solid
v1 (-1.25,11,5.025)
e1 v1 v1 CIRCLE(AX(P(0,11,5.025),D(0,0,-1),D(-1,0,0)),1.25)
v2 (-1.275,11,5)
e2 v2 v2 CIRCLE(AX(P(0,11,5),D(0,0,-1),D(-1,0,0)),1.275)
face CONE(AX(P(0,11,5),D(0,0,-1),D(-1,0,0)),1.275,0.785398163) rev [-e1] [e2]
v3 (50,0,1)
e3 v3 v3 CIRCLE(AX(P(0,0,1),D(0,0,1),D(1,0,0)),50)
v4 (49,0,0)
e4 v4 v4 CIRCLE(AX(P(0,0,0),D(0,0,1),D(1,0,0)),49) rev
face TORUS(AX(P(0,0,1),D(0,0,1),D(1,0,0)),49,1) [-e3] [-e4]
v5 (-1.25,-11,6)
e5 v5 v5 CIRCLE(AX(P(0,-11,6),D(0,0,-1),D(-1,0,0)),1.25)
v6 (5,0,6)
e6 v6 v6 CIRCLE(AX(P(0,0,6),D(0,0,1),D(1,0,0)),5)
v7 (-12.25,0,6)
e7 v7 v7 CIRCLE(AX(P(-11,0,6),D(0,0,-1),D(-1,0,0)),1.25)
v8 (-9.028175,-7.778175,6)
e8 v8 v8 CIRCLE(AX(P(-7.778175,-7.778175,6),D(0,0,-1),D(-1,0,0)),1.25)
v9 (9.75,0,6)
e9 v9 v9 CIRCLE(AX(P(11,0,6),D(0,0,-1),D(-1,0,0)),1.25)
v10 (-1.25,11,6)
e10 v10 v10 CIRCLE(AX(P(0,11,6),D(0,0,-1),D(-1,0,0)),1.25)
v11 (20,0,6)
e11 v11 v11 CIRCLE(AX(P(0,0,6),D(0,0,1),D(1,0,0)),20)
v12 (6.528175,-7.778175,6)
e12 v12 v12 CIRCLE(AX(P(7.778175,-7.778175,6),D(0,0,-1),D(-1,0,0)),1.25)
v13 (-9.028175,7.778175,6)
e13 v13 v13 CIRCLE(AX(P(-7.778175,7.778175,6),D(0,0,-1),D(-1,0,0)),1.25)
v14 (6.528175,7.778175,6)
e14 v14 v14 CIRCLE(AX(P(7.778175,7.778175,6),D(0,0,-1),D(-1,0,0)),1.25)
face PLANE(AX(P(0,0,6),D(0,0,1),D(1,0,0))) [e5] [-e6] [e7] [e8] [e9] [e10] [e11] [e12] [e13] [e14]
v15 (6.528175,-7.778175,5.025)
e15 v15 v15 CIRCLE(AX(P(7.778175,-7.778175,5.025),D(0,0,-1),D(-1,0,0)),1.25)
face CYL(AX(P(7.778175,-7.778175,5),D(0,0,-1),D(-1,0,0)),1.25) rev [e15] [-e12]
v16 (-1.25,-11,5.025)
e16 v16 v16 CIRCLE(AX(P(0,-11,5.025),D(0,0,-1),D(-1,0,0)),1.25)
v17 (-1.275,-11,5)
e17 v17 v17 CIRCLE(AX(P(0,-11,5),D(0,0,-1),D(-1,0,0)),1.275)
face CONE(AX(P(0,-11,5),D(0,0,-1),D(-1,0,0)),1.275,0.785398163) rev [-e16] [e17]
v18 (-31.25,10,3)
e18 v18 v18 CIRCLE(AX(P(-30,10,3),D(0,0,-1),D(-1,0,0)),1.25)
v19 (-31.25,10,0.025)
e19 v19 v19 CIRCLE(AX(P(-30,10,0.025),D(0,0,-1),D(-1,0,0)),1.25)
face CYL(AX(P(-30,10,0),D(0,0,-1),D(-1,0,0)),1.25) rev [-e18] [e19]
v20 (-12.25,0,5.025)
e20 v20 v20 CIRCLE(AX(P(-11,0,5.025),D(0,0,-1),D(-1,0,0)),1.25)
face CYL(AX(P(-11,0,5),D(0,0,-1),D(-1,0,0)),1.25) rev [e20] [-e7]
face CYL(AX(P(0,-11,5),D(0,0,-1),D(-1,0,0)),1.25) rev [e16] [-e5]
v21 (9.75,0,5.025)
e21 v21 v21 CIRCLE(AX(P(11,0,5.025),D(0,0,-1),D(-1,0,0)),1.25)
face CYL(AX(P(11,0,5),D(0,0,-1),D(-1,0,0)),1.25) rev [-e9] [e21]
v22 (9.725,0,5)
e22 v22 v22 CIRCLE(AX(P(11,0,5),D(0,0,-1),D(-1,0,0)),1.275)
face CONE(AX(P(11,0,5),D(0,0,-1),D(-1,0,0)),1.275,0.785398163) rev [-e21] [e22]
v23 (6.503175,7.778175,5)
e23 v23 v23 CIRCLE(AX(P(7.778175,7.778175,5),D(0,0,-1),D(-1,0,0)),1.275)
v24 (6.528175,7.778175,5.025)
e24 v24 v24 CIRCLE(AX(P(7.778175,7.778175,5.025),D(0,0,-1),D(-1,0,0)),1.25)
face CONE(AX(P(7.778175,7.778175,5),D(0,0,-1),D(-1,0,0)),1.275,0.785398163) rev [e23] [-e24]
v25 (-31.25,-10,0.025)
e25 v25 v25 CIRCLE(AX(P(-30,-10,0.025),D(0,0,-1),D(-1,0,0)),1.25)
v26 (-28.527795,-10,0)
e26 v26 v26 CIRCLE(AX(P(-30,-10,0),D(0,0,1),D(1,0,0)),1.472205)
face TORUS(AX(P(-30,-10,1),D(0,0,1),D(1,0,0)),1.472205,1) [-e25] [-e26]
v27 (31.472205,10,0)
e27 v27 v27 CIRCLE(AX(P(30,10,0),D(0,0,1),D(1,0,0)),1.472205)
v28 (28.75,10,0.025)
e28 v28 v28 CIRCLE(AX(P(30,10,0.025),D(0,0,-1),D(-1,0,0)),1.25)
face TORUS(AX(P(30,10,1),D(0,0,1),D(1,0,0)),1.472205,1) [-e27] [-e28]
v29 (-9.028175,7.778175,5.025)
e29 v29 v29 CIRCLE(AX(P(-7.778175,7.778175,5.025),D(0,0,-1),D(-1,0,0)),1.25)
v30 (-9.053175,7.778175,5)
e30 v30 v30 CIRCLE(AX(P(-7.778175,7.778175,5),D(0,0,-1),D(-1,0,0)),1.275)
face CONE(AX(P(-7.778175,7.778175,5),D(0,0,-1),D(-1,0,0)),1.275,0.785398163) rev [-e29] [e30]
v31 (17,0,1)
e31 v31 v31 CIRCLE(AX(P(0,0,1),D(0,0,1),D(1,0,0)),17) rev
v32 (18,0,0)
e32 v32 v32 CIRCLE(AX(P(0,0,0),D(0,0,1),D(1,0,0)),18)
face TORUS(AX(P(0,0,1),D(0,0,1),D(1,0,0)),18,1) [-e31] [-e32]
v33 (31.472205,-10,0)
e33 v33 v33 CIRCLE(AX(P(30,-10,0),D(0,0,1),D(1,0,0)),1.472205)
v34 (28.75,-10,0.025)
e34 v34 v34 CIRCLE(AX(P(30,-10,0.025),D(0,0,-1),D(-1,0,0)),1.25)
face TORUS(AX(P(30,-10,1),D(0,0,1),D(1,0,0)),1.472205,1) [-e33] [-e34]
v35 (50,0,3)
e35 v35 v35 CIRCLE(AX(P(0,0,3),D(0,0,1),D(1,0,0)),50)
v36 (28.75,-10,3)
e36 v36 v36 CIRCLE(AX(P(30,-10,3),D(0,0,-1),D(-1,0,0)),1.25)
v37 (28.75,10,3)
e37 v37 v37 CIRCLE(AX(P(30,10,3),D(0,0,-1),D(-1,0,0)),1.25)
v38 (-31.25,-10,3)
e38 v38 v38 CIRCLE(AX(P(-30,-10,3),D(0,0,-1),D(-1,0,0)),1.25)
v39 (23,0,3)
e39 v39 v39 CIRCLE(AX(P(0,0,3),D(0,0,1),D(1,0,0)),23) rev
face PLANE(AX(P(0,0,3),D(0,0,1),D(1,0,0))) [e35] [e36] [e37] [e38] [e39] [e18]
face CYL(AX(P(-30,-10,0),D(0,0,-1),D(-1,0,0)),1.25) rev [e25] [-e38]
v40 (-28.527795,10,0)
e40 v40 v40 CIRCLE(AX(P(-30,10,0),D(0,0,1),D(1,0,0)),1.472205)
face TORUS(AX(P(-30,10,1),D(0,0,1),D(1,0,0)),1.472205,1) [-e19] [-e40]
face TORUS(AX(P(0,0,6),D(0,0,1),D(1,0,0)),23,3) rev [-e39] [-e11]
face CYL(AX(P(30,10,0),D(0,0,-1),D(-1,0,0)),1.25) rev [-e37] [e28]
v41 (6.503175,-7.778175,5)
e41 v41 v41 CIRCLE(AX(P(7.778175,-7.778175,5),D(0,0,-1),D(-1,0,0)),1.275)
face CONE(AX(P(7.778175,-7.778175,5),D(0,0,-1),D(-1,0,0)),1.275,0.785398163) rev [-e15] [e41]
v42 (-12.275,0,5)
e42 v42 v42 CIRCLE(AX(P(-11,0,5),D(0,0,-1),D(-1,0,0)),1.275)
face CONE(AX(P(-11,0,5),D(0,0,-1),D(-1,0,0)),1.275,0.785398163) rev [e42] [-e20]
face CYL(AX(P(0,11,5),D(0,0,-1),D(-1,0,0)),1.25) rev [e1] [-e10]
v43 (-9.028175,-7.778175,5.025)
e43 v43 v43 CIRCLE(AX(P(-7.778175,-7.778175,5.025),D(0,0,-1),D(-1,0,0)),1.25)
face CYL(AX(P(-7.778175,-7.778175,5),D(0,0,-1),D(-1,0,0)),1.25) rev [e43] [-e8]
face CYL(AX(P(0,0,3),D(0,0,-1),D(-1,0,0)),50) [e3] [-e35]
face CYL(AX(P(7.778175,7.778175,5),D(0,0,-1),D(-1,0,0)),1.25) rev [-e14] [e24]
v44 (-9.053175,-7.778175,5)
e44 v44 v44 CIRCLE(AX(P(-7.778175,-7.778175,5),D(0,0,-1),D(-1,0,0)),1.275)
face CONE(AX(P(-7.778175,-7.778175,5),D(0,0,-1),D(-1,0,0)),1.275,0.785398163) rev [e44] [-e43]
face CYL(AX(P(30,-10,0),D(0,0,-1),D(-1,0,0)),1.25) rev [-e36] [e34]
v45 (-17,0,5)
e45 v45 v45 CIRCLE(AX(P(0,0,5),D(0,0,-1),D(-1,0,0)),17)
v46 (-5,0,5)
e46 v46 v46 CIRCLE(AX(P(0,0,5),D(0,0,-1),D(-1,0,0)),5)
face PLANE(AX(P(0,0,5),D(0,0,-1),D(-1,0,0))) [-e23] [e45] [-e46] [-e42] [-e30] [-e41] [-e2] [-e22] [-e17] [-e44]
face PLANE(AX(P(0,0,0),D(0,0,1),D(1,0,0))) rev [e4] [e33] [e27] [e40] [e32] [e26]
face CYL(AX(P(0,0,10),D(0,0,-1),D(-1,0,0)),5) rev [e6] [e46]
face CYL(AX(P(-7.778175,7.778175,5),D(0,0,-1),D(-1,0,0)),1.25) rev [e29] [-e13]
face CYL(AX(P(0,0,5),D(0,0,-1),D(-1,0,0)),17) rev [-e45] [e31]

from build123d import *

# Parameters (mm, degrees)
SKETCH_1_R            = 50
EXTRUDE_1_DEPTH       = 3
F_2_5MM_1_D           = 2.5
F_2_5MM_1_CSINK_D     = 2.55
F_2_5MM_1_CSINK_ANGLE = 90
SKETCH_5_R            = 20
EXTRUDE_2_DEPTH       = 3
SKETCH_6_R            = 17
CUT_EXTRUDE_1_DEPTH   = 5
F_2_5MM_2_AT_2_COUNT  = 2
F_2_5MM_2_AT_2_PITCH  = 8.419035512
F_2_5MM_2_AT_3_COUNT  = 2
F_2_5MM_2_AT_3_PITCH  = 15.556349186
F_2_5MM_2_AT_4_COUNT  = 2
F_2_5MM_2_AT_4_PITCH  = 20.325349715
F_2_5MM_2_AT_5_COUNT  = 2
F_2_5MM_2_AT_5_PITCH  = 22
F_2_5MM_2_AT_6_COUNT  = 2
F_2_5MM_2_AT_6_PITCH  = 20.325349715
F_2_5MM_2_AT_7_COUNT  = 2
F_2_5MM_2_AT_7_PITCH  = 15.556349186
F_2_5MM_2_AT_8_COUNT  = 2
F_2_5MM_2_AT_8_PITCH  = 8.419035512
SKETCH_10_R           = 5
CUT_EXTRUDE_2_DEPTH   = 5
FILLET_1_R            = 1
FILLET_3_R            = 3


# Some blends are built 0.0001 mm under size
with BuildPart() as part:
    # 草图1 → 凸台-拉伸1 (new body)
    with BuildSketch(Plane.XY):
        Circle(SKETCH_1_R)
    extrude(amount=EXTRUDE_1_DEPTH)

    # Ø2.5mm 暗销孔1 (through all)
    with Locations(Plane(origin=(0, 0, 0), x_dir=(-1, 0, 0), z_dir=(0, 0, -1))):
        with Locations((-30, 10), (-30, -10), (30, -10), (30, 10)):
            CounterSinkHole(F_2_5MM_1_D / 2, F_2_5MM_1_CSINK_D / 2, counter_sink_angle=F_2_5MM_1_CSINK_ANGLE)

    # 草图5 → 凸台-拉伸2 (add)
    with BuildSketch(Plane.XY.offset(3)):
        Circle(SKETCH_5_R)
    extrude(amount=EXTRUDE_2_DEPTH)

    # 草图6 → 切除-拉伸1 (cut)
    with BuildSketch(Plane(origin=(0, 0, 0), x_dir=(-1, 0, 0), z_dir=(0, 0, -1))):
        Circle(SKETCH_6_R)
    extrude(amount=-CUT_EXTRUDE_1_DEPTH, mode=Mode.SUBTRACT)

    # 草图9 → Ø2.5mm 暗销孔2 (revolve, cut)
    with BuildSketch(Plane(origin=(11, 0, 5), x_dir=(0, 1, 0), z_dir=(1, 0, 0))):
        Polygon((0, 0), (0, 1), (1.25, 1), (1.25, 0.025), (1.275, 0), align=None)
    f_2_5mm_2 = revolve(axis=Axis((11, 0, -1.35), (0, 0, 1)), mode=Mode.SUBTRACT)

    # Ø2.5mm 暗销孔2 at 2: Ø2.5mm 暗销孔2 ×2
    with Locations(*[Vector(-0.38268343236200486, 0.9238795325125646, 0) * (i * F_2_5MM_2_AT_2_PITCH) for i in range(1, F_2_5MM_2_AT_2_COUNT)]):
        add(f_2_5mm_2, mode=Mode.SUBTRACT)

    # Ø2.5mm 暗销孔2 at 3: Ø2.5mm 暗销孔2 ×2
    with Locations(*[Vector(-0.7071067811841869, 0.7071067811889081, 0) * (i * F_2_5MM_2_AT_3_PITCH) for i in range(1, F_2_5MM_2_AT_3_COUNT)]):
        add(f_2_5mm_2, mode=Mode.SUBTRACT)

    # Ø2.5mm 暗销孔2 at 4: Ø2.5mm 暗销孔2 ×2
    with Locations(*[Vector(-0.9238795325100095, 0.3826834323681732, 0) * (i * F_2_5MM_2_AT_4_PITCH) for i in range(1, F_2_5MM_2_AT_4_COUNT)]):
        add(f_2_5mm_2, mode=Mode.SUBTRACT)

    # Ø2.5mm 暗销孔2 at 5: Ø2.5mm 暗销孔2 ×2
    with Locations(*[(-i * F_2_5MM_2_AT_5_PITCH, 0, 0) for i in range(1, F_2_5MM_2_AT_5_COUNT)]):
        add(f_2_5mm_2, mode=Mode.SUBTRACT)

    # Ø2.5mm 暗销孔2 at 6: Ø2.5mm 暗销孔2 ×2
    with Locations(*[Vector(-0.9238795325125633, -0.38268343236200797, 0) * (i * F_2_5MM_2_AT_6_PITCH) for i in range(1, F_2_5MM_2_AT_6_COUNT)]):
        add(f_2_5mm_2, mode=Mode.SUBTRACT)

    # Ø2.5mm 暗销孔2 at 7: Ø2.5mm 暗销孔2 ×2
    with Locations(*[Vector(-0.7071067811889058, -0.7071067811841893, 0) * (i * F_2_5MM_2_AT_7_PITCH) for i in range(1, F_2_5MM_2_AT_7_COUNT)]):
        add(f_2_5mm_2, mode=Mode.SUBTRACT)

    # Ø2.5mm 暗销孔2 at 8: Ø2.5mm 暗销孔2 ×2
    with Locations(*[Vector(-0.3826834323681702, -0.9238795325100109, 0) * (i * F_2_5MM_2_AT_8_PITCH) for i in range(1, F_2_5MM_2_AT_8_COUNT)]):
        add(f_2_5mm_2, mode=Mode.SUBTRACT)

    # 草图10 → 切除-拉伸2 (cut)
    with BuildSketch(Plane(origin=(0, 0, 5), x_dir=(-1, 0, 0), z_dir=(0, 0, -1))):
        Circle(SKETCH_10_R)
    extrude(amount=-CUT_EXTRUDE_2_DEPTH, mode=Mode.SUBTRACT)

    # 圆角1
    # the kernel refuses this fillet: 1 mm, written as the material it takes off along each edge
    with BuildSketch(Plane(origin=(-30, -10, 0), x_dir=(1, 0, 0), z_dir=(0, -1, 0))) as fillet_1_piece_1:
        with BuildLine():
            CenterArc((1.47220486, 1), FILLET_1_R, 257.161431859, 12.838568141)
            Line((1.25, 0.025), (1.245555903, 0.0055))
            ThreePointArc((1.245555903, 0.0055), (1.248357864, -0.001642136), (1.260857864, -0.014142136))
            Line((1.260857864, -0.014142136), (1.275, -0.02))
            Line((1.275, -0.02), (1.47220486, -0.02))
            Line((1.47220486, -0.02), (1.47220486, 0))
        make_face()
    revolve(axis=Axis((-30, -10, 0), (0, 0, 1)), mode=Mode.SUBTRACT)
    with BuildSketch(Plane(origin=(0, 0, 0), x_dir=(1, 0, 0), z_dir=(0, -1, 0))) as fillet_1_piece_2:
        with BuildLine():
            CenterArc((50 - FILLET_1_R, FILLET_1_R), FILLET_1_R, 270, 90)
            Line((50 - FILLET_1_R, 0), (50 - FILLET_1_R, -FILLET_1_R * 0.02))
            Line((50 - FILLET_1_R, -FILLET_1_R * 0.02), (50 + FILLET_1_R * 0.02, -FILLET_1_R * 0.02))
            Line((50 + FILLET_1_R * 0.02, -FILLET_1_R * 0.02), (50 + FILLET_1_R * 0.02, FILLET_1_R))
            Line((50 + FILLET_1_R * 0.02, FILLET_1_R), (50, FILLET_1_R))
        make_face()
    revolve(axis=Axis((0, 0, 0), (0, 0, 1)), mode=Mode.SUBTRACT)
    with BuildSketch(Plane(origin=(30, -10, 0), x_dir=(1, 0, 0), z_dir=(0, -1, 0))) as fillet_1_piece_3:
        with BuildLine():
            CenterArc((1.47220486, 1), FILLET_1_R, 257.161431859, 12.838568141)
            Line((1.25, 0.025), (1.245555903, 0.0055))
            ThreePointArc((1.245555903, 0.0055), (1.248357864, -0.001642136), (1.260857864, -0.014142136))
            Line((1.260857864, -0.014142136), (1.275, -0.02))
            Line((1.275, -0.02), (1.47220486, -0.02))
            Line((1.47220486, -0.02), (1.47220486, 0))
        make_face()
    revolve(axis=Axis((30, -10, 0), (0, 0, 1)), mode=Mode.SUBTRACT)
    with BuildSketch(Plane(origin=(30, 10, 0), x_dir=(1, 0, 0), z_dir=(0, -1, 0))) as fillet_1_piece_4:
        with BuildLine():
            CenterArc((1.47220486, 1), FILLET_1_R, 257.161431859, 12.838568141)
            Line((1.25, 0.025), (1.245555903, 0.0055))
            ThreePointArc((1.245555903, 0.0055), (1.248357864, -0.001642136), (1.260857864, -0.014142136))
            Line((1.260857864, -0.014142136), (1.275, -0.02))
            Line((1.275, -0.02), (1.47220486, -0.02))
            Line((1.47220486, -0.02), (1.47220486, 0))
        make_face()
    revolve(axis=Axis((30, 10, 0), (0, 0, 1)), mode=Mode.SUBTRACT)
    with BuildSketch(Plane(origin=(0, 0, 0), x_dir=(-1, 0, 0), z_dir=(0, -1, 0))) as fillet_1_piece_5:
        with BuildLine():
            CenterArc((17 + FILLET_1_R, -FILLET_1_R), FILLET_1_R, 90, 90)
            Line((17, -FILLET_1_R), (17 - FILLET_1_R * 0.02, -FILLET_1_R))
            Line((17 - FILLET_1_R * 0.02, -FILLET_1_R), (17 - FILLET_1_R * 0.02, FILLET_1_R * 0.02))
            Line((17 - FILLET_1_R * 0.02, FILLET_1_R * 0.02), (17 + FILLET_1_R, FILLET_1_R * 0.02))
            Line((17 + FILLET_1_R, FILLET_1_R * 0.02), (17 + FILLET_1_R, 0))
        make_face()
    revolve(axis=Axis((0, 0, 0), (0, 0, -1)), mode=Mode.SUBTRACT)
    with BuildSketch(Plane(origin=(-30, 10, 0), x_dir=(1, 0, 0), z_dir=(0, -1, 0))) as fillet_1_piece_6:
        with BuildLine():
            CenterArc((1.47220486, 1), FILLET_1_R, 257.161431859, 12.838568141)
            Line((1.25, 0.025), (1.245555903, 0.0055))
            ThreePointArc((1.245555903, 0.0055), (1.248357864, -0.001642136), (1.260857864, -0.014142136))
            Line((1.260857864, -0.014142136), (1.275, -0.02))
            Line((1.275, -0.02), (1.47220486, -0.02))
            Line((1.47220486, -0.02), (1.47220486, 0))
        make_face()
    revolve(axis=Axis((-30, 10, 0), (0, 0, 1)), mode=Mode.SUBTRACT)

    # 圆角3
    fillet_3_edges = [part.edges().sort_by_distance(p)[0] for p in [
        (-20, 0, 3),
    ]]
    fillet(fillet_3_edges, radius=FILLET_3_R - 0.0001)  # a hair under: the kernel refuses the full size


solid = part.part
